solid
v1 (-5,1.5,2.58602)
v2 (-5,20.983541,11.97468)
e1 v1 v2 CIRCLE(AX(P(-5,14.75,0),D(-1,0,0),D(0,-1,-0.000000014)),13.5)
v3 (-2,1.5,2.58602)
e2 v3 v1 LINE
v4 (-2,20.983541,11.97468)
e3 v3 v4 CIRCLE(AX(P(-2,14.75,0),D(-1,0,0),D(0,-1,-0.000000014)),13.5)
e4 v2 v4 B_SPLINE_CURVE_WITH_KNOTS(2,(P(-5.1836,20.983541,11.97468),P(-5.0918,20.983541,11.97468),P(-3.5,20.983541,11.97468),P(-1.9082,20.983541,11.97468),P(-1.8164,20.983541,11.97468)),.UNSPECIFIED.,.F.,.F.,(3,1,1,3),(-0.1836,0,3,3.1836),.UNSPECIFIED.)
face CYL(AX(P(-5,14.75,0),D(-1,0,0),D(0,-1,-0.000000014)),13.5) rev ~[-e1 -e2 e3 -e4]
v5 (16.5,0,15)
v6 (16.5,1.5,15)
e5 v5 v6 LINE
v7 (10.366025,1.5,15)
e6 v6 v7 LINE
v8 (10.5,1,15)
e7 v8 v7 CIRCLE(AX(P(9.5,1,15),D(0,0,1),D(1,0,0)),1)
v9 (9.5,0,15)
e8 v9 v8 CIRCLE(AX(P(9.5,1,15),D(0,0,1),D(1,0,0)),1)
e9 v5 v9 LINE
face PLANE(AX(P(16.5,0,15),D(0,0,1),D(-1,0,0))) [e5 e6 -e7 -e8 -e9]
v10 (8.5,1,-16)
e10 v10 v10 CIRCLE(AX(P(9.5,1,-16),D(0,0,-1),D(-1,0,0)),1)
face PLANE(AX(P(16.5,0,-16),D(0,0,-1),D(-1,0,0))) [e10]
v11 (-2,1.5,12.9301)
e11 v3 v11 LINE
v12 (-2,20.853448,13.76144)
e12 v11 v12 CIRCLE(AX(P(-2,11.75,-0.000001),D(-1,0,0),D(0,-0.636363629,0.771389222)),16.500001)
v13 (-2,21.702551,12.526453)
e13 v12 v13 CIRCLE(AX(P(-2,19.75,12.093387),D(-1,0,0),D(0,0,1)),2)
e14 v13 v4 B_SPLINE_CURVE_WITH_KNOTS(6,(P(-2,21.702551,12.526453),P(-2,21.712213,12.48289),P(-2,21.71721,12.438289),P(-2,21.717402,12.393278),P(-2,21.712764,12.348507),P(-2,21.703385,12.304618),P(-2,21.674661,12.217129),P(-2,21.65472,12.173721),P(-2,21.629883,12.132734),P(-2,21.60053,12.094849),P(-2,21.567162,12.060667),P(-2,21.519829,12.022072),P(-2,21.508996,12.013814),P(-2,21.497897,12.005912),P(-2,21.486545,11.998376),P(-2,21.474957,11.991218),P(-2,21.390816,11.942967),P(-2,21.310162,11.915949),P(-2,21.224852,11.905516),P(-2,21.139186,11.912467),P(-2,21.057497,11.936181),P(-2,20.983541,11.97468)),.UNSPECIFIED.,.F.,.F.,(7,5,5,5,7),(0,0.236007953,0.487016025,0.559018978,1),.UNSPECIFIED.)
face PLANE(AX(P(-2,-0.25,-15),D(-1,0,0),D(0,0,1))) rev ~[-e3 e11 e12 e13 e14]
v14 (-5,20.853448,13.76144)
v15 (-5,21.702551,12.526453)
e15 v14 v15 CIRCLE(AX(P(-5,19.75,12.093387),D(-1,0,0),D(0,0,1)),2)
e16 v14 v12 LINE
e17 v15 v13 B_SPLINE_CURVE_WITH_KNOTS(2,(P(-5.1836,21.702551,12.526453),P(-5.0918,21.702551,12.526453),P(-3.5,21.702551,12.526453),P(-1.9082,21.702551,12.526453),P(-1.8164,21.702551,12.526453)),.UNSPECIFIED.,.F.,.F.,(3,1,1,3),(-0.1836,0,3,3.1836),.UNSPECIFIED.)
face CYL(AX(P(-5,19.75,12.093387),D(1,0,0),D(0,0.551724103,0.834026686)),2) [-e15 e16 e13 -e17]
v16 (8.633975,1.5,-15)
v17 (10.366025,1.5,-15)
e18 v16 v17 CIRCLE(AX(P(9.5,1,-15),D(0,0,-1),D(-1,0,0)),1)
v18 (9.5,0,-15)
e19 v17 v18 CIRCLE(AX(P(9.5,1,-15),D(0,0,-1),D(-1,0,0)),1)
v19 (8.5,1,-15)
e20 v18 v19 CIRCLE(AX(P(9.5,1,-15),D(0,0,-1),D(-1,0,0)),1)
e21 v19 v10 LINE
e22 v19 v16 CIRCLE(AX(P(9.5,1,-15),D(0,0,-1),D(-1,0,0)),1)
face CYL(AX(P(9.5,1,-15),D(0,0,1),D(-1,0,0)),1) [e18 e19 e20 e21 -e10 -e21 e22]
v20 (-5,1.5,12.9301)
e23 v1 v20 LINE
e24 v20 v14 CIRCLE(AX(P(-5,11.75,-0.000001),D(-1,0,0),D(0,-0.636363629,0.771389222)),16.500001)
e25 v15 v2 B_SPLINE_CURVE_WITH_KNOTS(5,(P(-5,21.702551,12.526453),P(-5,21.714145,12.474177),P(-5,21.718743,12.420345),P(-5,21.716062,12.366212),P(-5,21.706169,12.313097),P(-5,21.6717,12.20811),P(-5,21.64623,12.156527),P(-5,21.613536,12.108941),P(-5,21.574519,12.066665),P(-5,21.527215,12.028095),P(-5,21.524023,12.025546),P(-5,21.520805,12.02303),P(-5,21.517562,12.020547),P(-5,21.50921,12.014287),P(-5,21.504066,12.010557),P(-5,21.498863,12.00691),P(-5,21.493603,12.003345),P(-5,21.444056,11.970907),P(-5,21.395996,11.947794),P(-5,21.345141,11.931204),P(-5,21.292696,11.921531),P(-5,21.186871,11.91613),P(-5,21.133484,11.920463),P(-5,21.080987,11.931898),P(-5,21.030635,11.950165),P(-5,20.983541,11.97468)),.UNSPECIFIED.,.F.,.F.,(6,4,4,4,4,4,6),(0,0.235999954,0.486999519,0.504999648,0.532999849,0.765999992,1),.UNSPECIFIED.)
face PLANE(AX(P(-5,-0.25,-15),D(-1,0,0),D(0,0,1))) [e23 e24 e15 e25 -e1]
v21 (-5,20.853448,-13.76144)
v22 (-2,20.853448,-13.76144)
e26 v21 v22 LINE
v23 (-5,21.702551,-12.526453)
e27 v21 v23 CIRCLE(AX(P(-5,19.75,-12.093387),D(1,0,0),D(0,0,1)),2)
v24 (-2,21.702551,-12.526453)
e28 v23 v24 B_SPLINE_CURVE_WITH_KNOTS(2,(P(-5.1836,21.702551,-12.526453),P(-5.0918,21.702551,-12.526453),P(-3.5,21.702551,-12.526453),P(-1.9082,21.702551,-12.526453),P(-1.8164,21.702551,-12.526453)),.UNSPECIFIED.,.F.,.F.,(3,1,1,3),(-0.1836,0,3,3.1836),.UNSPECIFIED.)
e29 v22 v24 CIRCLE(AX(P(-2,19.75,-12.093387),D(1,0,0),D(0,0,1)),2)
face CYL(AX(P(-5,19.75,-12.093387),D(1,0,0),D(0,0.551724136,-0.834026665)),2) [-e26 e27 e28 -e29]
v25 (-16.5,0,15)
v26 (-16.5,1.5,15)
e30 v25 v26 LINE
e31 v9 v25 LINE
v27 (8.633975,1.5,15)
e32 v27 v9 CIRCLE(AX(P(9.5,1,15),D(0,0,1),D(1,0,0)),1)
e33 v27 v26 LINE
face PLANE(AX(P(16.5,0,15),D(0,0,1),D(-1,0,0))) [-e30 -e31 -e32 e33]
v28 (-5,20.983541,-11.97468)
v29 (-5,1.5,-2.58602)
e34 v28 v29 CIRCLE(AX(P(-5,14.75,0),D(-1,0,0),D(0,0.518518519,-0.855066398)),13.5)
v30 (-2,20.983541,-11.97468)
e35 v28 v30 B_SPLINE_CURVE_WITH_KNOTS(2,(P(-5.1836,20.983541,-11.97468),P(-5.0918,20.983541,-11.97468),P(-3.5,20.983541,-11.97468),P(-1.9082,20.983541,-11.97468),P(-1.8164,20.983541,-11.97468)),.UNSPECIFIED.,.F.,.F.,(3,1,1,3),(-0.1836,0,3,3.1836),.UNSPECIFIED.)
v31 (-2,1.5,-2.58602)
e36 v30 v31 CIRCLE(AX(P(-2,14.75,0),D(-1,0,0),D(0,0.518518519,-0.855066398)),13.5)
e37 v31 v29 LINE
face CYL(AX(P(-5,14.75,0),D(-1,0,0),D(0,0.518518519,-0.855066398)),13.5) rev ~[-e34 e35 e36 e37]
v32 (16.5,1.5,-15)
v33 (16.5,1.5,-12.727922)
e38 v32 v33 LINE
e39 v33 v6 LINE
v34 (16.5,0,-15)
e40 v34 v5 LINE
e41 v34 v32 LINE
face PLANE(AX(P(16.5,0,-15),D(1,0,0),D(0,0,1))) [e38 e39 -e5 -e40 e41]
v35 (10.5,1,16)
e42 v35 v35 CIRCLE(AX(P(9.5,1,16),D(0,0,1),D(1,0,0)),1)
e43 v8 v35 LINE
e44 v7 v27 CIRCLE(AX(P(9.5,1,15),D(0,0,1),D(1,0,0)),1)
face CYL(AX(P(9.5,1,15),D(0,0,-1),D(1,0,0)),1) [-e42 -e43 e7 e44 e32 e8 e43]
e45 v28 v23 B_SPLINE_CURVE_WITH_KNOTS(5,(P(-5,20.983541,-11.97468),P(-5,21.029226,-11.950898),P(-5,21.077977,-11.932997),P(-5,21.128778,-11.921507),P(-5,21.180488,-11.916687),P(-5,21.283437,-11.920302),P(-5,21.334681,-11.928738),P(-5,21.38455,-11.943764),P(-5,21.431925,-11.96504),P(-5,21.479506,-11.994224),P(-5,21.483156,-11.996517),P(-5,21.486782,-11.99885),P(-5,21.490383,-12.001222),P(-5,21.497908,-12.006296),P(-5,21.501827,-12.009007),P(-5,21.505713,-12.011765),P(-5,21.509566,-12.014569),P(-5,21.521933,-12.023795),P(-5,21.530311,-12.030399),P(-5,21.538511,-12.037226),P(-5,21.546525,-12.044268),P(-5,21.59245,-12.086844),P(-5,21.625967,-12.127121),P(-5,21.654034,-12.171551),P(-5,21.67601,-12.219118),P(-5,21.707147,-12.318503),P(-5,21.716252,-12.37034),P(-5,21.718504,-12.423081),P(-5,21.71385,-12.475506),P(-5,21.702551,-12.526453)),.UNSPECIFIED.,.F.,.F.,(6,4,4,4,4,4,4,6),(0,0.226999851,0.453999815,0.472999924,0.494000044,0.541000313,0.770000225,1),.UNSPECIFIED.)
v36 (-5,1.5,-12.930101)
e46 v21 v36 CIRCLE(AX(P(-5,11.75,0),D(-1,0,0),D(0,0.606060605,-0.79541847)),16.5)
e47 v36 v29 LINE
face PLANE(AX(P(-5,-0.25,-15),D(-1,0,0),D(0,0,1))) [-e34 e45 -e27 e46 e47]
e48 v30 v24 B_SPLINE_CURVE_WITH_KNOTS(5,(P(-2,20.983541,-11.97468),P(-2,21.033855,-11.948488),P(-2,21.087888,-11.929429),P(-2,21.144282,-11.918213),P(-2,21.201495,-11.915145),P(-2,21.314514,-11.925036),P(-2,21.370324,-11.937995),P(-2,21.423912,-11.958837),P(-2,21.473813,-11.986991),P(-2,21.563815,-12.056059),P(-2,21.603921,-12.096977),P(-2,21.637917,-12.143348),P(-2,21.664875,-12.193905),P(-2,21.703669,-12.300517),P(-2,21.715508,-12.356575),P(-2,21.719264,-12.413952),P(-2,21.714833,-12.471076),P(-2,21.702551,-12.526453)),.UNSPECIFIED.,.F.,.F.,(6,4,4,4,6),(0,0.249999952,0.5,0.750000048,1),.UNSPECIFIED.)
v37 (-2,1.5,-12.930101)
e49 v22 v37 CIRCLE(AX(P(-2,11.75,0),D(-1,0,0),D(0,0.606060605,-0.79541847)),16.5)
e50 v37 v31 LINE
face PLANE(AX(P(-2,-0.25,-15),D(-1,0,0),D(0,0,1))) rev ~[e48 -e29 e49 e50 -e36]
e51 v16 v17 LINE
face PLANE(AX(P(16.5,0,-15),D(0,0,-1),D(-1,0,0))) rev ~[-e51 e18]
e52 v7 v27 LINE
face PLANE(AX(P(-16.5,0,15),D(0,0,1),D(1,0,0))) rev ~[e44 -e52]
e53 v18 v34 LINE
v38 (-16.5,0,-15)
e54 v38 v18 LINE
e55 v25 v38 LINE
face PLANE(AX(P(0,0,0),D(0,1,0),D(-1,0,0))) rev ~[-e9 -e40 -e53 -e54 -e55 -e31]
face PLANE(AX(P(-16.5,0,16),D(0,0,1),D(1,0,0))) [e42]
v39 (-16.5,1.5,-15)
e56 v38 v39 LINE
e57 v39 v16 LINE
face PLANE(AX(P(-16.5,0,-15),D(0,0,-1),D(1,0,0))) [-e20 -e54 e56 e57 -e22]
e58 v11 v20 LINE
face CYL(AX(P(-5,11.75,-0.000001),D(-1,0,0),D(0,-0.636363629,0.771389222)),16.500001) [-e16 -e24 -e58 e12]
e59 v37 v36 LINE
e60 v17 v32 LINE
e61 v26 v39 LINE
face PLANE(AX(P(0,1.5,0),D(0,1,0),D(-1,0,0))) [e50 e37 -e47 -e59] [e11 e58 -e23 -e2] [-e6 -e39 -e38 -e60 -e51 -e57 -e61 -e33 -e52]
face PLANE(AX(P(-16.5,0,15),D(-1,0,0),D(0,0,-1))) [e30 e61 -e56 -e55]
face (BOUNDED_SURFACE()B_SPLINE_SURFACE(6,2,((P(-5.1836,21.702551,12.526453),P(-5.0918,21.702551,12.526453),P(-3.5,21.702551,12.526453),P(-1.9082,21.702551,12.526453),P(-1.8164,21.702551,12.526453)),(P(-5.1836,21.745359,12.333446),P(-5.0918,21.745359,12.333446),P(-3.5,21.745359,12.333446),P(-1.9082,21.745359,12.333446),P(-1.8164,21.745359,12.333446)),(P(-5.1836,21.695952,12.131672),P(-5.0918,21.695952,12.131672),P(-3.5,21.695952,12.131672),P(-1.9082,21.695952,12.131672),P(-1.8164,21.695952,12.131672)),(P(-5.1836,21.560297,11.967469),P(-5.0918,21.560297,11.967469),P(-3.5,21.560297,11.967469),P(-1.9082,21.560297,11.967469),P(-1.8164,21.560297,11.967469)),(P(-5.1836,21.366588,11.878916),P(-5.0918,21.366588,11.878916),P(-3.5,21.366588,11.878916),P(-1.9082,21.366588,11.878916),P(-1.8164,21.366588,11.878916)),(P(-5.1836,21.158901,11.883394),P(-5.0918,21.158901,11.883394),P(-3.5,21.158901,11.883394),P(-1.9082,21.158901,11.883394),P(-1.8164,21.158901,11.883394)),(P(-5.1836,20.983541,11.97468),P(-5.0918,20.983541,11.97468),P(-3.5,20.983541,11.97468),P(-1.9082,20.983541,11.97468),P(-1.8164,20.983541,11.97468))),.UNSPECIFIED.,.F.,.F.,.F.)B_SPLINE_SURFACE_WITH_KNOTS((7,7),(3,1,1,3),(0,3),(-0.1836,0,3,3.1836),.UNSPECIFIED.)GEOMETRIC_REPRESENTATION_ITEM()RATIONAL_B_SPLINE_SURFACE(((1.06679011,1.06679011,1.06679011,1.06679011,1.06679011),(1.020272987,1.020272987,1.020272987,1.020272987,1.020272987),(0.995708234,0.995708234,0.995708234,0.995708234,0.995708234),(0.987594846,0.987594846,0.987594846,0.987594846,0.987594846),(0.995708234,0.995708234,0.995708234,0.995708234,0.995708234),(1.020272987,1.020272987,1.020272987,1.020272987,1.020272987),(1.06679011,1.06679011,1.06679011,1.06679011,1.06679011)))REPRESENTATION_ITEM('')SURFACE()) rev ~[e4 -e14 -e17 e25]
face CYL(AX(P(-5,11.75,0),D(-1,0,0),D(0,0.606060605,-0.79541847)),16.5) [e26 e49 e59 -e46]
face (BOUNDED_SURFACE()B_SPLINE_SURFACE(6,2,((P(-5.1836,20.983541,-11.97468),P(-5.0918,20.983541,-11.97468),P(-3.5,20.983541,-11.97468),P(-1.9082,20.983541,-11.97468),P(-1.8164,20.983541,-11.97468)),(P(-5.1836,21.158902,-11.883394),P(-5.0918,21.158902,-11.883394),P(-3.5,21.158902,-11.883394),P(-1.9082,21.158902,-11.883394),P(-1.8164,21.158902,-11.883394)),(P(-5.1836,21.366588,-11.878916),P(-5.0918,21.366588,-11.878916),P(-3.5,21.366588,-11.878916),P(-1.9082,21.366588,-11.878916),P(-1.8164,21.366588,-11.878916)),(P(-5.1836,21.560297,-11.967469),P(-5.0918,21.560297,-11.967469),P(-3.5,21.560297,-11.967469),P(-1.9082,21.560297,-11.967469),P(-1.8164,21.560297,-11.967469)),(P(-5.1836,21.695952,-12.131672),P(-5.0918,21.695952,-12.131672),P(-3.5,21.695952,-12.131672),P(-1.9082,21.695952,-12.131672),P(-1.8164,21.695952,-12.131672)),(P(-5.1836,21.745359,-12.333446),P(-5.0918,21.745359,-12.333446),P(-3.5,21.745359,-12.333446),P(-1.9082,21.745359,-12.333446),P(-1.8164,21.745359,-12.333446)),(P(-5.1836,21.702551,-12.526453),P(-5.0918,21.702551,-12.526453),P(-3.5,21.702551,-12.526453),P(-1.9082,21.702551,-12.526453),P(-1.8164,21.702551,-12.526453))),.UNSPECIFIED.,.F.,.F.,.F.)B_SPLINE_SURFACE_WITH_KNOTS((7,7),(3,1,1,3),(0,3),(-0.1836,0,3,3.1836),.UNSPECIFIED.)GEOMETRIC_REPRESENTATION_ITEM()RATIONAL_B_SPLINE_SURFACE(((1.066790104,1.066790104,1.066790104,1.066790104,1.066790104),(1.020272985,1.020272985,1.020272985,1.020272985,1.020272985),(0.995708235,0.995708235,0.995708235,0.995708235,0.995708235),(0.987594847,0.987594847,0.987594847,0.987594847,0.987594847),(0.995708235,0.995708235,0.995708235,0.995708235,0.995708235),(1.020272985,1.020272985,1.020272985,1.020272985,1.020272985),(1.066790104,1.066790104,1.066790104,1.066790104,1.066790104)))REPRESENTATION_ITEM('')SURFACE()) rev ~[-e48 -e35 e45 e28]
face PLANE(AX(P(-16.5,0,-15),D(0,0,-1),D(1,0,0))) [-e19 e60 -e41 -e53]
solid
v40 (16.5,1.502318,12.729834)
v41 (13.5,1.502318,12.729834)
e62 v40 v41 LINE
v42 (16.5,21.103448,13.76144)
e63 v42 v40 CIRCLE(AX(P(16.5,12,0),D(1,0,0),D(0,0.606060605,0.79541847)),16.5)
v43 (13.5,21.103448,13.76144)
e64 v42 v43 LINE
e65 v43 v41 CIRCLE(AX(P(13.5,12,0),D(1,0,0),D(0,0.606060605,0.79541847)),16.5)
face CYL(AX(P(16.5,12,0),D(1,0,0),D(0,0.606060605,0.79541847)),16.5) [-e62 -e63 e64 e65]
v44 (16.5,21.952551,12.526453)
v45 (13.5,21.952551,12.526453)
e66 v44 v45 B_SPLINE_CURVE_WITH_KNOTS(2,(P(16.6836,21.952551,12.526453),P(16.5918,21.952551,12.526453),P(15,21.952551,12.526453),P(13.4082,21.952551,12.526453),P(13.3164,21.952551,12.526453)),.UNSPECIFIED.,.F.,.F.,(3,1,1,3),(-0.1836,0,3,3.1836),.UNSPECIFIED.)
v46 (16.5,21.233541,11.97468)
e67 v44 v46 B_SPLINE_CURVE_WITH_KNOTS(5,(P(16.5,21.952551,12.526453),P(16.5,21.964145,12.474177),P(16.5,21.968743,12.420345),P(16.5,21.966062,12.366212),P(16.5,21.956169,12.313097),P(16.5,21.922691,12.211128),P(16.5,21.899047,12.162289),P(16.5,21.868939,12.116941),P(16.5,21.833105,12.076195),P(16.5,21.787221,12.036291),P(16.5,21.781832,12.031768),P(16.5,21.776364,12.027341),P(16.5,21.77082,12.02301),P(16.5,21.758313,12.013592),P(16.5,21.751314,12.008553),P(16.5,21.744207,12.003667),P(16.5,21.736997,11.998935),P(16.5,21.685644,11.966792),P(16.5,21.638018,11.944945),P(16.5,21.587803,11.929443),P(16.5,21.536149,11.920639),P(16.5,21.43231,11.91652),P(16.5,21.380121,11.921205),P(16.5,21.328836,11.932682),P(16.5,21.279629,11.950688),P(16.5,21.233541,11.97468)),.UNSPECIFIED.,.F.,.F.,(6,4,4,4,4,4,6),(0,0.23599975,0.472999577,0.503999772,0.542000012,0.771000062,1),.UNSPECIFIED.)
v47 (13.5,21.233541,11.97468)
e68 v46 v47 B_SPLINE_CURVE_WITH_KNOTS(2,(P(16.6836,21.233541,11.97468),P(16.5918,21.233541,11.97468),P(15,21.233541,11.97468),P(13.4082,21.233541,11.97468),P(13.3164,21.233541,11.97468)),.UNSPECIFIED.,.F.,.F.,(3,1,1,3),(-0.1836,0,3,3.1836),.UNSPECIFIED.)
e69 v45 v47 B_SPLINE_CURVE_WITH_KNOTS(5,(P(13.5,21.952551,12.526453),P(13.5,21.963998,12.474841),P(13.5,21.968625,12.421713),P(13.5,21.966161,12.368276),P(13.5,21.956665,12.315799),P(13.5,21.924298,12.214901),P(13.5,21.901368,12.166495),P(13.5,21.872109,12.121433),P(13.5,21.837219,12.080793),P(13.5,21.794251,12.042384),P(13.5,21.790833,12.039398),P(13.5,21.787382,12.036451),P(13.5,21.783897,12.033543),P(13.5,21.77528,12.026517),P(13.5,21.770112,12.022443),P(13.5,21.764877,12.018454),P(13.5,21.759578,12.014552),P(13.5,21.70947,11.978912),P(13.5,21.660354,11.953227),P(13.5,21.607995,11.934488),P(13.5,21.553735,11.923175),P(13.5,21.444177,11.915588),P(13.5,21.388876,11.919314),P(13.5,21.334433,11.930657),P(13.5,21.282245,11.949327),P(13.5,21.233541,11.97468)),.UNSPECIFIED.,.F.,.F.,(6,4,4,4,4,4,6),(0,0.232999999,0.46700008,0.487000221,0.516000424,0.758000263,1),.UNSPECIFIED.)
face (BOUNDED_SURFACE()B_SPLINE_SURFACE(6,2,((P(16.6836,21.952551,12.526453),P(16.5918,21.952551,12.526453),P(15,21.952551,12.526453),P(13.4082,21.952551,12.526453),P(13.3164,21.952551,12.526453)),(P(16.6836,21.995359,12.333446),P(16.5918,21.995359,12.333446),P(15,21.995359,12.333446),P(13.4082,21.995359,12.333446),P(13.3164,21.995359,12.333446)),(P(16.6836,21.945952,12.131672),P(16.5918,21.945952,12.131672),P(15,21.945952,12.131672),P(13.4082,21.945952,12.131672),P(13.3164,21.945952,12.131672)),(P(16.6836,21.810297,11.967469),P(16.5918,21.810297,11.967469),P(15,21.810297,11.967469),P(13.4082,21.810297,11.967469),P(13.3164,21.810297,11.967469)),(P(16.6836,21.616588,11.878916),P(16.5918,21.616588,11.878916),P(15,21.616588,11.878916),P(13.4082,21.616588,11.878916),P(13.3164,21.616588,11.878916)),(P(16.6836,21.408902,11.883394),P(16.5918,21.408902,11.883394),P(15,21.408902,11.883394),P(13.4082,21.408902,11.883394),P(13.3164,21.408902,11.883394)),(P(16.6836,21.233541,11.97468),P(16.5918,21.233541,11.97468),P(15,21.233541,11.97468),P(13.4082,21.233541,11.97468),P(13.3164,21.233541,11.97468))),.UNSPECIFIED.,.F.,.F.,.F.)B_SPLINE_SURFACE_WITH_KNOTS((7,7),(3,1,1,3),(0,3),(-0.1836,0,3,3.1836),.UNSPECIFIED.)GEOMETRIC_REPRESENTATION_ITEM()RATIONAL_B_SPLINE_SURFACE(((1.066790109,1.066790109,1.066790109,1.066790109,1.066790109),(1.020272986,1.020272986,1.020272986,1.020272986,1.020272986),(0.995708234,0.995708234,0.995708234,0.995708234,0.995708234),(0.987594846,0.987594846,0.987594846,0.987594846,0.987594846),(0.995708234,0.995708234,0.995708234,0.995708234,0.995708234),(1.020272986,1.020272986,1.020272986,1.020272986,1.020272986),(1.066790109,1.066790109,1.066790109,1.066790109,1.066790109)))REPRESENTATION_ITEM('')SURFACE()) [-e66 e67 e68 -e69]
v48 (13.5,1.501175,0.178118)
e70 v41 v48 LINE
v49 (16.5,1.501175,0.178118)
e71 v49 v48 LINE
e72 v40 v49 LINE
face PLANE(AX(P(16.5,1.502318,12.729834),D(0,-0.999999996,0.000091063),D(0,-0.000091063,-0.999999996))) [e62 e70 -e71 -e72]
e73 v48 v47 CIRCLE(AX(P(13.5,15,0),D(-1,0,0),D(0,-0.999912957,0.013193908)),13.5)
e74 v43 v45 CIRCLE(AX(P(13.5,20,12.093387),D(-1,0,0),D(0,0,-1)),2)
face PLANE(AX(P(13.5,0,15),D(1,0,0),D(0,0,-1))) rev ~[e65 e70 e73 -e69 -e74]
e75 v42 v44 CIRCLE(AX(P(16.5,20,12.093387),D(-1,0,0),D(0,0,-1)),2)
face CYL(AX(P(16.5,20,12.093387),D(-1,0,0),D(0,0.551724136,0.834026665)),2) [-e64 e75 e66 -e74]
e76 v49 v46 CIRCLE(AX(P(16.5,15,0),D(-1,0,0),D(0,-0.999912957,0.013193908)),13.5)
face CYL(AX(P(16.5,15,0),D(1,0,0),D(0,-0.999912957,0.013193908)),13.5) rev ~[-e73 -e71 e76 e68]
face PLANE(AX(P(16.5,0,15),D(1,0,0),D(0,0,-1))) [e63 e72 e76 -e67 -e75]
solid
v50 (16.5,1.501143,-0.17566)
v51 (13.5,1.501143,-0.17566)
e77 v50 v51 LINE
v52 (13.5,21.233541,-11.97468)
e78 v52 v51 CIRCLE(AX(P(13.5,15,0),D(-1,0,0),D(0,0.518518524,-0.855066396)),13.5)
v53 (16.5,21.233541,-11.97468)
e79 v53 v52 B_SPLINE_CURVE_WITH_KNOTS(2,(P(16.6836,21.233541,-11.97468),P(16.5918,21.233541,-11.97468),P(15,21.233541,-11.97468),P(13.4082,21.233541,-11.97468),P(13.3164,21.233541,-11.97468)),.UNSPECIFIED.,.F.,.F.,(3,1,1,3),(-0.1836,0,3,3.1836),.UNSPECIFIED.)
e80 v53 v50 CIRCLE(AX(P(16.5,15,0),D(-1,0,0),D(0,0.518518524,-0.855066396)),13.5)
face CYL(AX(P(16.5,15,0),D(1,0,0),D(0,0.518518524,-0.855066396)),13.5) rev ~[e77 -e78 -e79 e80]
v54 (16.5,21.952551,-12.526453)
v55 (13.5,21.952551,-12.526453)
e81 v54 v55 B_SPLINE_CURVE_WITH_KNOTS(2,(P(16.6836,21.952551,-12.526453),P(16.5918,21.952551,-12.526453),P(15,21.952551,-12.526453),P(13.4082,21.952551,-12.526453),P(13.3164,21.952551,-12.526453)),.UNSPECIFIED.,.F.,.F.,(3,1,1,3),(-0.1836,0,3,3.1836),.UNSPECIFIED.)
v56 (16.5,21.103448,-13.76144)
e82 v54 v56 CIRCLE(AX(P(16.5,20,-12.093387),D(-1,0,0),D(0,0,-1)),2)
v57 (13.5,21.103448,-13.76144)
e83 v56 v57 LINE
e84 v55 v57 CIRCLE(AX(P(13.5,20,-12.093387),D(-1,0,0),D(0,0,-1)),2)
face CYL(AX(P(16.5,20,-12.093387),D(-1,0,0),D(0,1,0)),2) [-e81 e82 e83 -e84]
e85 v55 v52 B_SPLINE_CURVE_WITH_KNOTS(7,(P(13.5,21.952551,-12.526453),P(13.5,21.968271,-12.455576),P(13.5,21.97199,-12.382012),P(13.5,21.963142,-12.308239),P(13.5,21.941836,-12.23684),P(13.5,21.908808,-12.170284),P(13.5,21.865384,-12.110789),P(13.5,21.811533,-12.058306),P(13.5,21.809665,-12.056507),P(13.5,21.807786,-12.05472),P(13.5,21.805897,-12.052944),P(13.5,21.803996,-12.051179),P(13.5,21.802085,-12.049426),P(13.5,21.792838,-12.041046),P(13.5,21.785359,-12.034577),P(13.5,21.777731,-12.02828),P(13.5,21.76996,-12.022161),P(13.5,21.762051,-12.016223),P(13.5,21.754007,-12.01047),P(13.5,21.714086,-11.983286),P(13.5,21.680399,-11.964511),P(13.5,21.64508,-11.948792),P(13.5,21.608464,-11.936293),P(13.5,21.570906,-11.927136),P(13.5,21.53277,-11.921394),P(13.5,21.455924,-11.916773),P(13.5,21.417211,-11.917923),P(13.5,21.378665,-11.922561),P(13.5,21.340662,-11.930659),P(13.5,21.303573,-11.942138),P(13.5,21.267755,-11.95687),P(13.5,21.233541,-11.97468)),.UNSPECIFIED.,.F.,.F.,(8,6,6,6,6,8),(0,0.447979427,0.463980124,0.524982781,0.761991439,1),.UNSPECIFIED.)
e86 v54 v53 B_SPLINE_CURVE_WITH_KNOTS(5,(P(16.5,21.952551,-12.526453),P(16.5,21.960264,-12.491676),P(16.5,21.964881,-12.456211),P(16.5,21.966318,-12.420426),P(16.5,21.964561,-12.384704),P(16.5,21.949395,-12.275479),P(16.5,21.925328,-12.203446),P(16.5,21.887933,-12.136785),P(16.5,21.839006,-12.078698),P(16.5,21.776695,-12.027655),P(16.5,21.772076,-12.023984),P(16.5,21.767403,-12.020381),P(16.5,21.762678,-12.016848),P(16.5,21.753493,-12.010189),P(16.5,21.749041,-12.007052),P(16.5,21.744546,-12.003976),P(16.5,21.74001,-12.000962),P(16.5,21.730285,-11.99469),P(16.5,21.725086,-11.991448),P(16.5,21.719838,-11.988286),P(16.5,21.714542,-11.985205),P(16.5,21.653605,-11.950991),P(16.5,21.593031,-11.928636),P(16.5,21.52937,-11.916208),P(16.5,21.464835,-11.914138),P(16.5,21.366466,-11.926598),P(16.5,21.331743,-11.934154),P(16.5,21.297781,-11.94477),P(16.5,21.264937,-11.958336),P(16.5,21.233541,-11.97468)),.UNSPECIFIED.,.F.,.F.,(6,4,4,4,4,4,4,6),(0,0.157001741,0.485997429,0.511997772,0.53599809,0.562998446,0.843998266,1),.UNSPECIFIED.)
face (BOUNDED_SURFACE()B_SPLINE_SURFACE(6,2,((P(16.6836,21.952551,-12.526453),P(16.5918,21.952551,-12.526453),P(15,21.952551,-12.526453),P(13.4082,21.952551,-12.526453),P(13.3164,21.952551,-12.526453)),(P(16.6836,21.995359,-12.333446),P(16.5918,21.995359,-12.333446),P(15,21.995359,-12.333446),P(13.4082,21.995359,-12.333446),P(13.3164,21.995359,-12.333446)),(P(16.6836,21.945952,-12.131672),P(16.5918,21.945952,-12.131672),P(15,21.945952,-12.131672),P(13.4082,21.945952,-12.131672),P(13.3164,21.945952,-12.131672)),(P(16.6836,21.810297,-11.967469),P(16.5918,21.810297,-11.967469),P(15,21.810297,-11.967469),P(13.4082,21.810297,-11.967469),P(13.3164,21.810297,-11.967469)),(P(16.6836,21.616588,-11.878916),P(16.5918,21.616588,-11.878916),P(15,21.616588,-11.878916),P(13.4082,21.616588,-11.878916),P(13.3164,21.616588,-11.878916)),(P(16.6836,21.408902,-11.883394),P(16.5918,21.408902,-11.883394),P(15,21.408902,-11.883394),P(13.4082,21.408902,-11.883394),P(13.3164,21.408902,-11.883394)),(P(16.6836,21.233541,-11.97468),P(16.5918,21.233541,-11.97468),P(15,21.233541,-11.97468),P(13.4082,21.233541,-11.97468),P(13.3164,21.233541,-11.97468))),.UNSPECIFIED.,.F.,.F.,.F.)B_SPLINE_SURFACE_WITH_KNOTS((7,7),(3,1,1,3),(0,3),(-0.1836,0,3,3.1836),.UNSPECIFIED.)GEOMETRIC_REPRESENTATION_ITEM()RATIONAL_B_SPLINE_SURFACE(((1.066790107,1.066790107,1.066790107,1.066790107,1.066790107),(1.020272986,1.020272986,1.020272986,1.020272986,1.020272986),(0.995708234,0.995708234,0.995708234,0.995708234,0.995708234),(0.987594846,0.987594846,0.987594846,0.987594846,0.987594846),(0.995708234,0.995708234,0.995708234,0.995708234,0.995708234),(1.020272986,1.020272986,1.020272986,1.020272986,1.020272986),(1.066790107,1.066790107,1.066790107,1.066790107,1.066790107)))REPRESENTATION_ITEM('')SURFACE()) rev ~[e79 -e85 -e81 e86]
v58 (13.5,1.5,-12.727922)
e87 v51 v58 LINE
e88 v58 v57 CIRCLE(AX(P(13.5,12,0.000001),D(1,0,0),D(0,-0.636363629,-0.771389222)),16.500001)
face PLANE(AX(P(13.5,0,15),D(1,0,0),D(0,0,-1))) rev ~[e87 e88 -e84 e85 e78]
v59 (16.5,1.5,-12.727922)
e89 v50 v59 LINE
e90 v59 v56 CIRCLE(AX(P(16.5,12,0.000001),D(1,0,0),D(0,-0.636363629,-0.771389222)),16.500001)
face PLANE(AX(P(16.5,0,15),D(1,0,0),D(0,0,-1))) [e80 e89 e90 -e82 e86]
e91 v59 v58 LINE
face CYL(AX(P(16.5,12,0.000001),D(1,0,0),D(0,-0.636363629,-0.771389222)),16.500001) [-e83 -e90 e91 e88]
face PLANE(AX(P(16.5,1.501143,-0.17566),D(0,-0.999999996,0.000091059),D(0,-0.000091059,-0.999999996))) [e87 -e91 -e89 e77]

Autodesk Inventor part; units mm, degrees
sketch "Szkic1" plane through (0, 0, 0) normal (0, 1, 0) x (-1, 0, 0)
  line L0 (-16.5, 15) -> (16.5, 15)
  line L1 (16.5, 15) -> (16.5, -15)
  line L2 (16.5, -15) -> (-16.5, -15)
  line L3 (-16.5, -15) -> (-16.5, 15)
  line L4 (-16.5, 15) -> (16.5, -15) construction
  line L5 (16.5, 15) -> (-16.5, -15) construction
  point P0 (0, 0)
  dimension "d0" = 33
  dimension "d1" = 30
extrude "Wyciągnięcie proste1" add sketch "Szkic1" along normal blind 1.5
sketch "Szkic2" plane through (-16.5, 0, 15) normal (0, 0, 1) x (1, 0, 0)
  circle A0 centre (26, 1) radius 1
  point P0 (16.5, 0)
  dimension "d4" = 2
sketch "Szkic3" plane through (16.5, 0, -15) normal (0, 0, -1) x (-1, 0, 0)
  circle A0 centre (7, 1) radius 1
  point P0 (16.5, 0)
  dimension "d5" = 2
extrude "Wyciągnięcie proste2" add sketch "Szkic3" along normal blind 1
extrude "Wyciągnięcie proste3" add sketch "Szkic2" along normal blind 1
sketch "Szkic4" plane through (16.5, 0, 15) normal (1, 0, 0) x (0, 0, -1)
  arc A0 (3.456604, 22) -> (15, 1.5) centre (15, 15) ccw
  line L0 (1.875595, 22) -> (3.456604, 22)
  line L1 (26.543396, 22) -> (28.124405, 22)
  arc A1 (1.875595, 22) -> (2.270166, 1.502318) centre (15, 12) ccw
  line L2 (2.270166, 1.502318) -> (14.821882, 1.501175)
  line L3 (15.17566, 1.501143) -> (27.727922, 1.5)
  line L4 (14.821882, 1.501175) -> (15.17566, 1.501143)
  arc A2 (2.270166, 1.502318) -> (2.272078, 1.5) centre (15, 12) ccw
  arc A3 (15, 1.5) -> (26.543396, 22) centre (15, 15) ccw
  arc A4 (27.727922, 1.5) -> (28.124405, 22) centre (15, 12) ccw
  point P0 (15, 0)
sketch "Szkic4 outline for Wyciągnięcie proste4" plane through (16.5, 0, 15) normal (1, 0, 0) x (0, 0, -1)
  line L0 (3.456604, 22) -> (1.875595, 22)
  arc A0 (14.821882, 1.501175) -> (3.456604, 22) centre (15, 15) cw
  line L1 (2.270166, 1.502318) -> (14.821882, 1.501175)
  arc A1 (1.875595, 22) -> (2.270166, 1.502318) centre (15, 12) ccw
  arc A2 (26.543396, 22) -> (15.17566, 1.501143) centre (15, 15) cw
  line L2 (28.124405, 22) -> (26.543396, 22)
  arc A3 (27.727922, 1.5) -> (28.124405, 22) centre (15, 12) ccw
  line L3 (15.17566, 1.501143) -> (27.727922, 1.5)
extrude "Wyciągnięcie proste4" add sketch "Szkic4 outline for Wyciągnięcie proste4" against normal blind 3
ref_plane "Płaszczyzna konstrukcyjna1" through (-11.5, 3.25, -15) normal (-1, 0, 0) x (0, 0, 1)
ref_plane "Płaszczyzna konstrukcyjna2" through (-11.5, -0.25, -15) normal (-1, 0, 0) x (0, 0, 1)
ref_plane "Płaszczyzna konstrukcyjna3" through (-5, -0.25, -15) normal (-1, 0, 0) x (0, 0, 1)
sketch "Szkic5" plane through (-5, -0.25, -15) normal (-1, 0, 0) x (0, 0, 1)
  arc A0 (3.456604, 22) -> (15, 1.5) centre (15, 15) ccw
  line L0 (1.875595, 22) -> (3.456604, 22)
  line L1 (26.543396, 22) -> (28.124405, 22)
  arc A1 (1.875595, 22) -> (2.270166, 1.502318) centre (15, 12) ccw
  line L2 (2.270166, 1.502318) -> (14.821882, 1.501175)
  line L3 (15.17566, 1.501143) -> (27.727922, 1.5)
  line L4 (14.821882, 1.501175) -> (15.17566, 1.501143)
  arc A2 (2.270166, 1.502318) -> (2.272078, 1.5) centre (15, 12) ccw
  arc A3 (15, 1.5) -> (26.543396, 22) centre (15, 15) ccw
  arc A4 (27.727922, 1.5) -> (28.124405, 22) centre (15, 12) ccw
  point P0 (15, 0)
extrude "Wyciągnięcie proste5" add sketch "Szkic5" against normal blind 3
fillet "Zaokrąglenie1" radius 2 1 edges at (15, 22, 13.1244)
fillet "Zaokrąglenie2" radius 2 1 edges at (15, 22, -13.1244)
fillet "Zaokrąglenie3" radius 2 1 edges at (-3.5, 21.75, -13.1244)
fillet "Zaokrąglenie4" radius 2 1 edges at (-3.5, 21.75, 13.1244)
fillet "Zaokrąglenie5" radius 0.5 1 edges at (15, 22, 11.5434)
fillet "Zaokrąglenie6" radius 0.5 1 edges at (-3.5, 21.75, 11.5434)
fillet "Zaokrąglenie7" radius 0.5 1 edges at (-3.5, 21.75, -11.5434)
fillet "Zaokrąglenie8" radius 0.5 1 edges at (15, 22, -11.5434)
properties part number "FanGrasp"
